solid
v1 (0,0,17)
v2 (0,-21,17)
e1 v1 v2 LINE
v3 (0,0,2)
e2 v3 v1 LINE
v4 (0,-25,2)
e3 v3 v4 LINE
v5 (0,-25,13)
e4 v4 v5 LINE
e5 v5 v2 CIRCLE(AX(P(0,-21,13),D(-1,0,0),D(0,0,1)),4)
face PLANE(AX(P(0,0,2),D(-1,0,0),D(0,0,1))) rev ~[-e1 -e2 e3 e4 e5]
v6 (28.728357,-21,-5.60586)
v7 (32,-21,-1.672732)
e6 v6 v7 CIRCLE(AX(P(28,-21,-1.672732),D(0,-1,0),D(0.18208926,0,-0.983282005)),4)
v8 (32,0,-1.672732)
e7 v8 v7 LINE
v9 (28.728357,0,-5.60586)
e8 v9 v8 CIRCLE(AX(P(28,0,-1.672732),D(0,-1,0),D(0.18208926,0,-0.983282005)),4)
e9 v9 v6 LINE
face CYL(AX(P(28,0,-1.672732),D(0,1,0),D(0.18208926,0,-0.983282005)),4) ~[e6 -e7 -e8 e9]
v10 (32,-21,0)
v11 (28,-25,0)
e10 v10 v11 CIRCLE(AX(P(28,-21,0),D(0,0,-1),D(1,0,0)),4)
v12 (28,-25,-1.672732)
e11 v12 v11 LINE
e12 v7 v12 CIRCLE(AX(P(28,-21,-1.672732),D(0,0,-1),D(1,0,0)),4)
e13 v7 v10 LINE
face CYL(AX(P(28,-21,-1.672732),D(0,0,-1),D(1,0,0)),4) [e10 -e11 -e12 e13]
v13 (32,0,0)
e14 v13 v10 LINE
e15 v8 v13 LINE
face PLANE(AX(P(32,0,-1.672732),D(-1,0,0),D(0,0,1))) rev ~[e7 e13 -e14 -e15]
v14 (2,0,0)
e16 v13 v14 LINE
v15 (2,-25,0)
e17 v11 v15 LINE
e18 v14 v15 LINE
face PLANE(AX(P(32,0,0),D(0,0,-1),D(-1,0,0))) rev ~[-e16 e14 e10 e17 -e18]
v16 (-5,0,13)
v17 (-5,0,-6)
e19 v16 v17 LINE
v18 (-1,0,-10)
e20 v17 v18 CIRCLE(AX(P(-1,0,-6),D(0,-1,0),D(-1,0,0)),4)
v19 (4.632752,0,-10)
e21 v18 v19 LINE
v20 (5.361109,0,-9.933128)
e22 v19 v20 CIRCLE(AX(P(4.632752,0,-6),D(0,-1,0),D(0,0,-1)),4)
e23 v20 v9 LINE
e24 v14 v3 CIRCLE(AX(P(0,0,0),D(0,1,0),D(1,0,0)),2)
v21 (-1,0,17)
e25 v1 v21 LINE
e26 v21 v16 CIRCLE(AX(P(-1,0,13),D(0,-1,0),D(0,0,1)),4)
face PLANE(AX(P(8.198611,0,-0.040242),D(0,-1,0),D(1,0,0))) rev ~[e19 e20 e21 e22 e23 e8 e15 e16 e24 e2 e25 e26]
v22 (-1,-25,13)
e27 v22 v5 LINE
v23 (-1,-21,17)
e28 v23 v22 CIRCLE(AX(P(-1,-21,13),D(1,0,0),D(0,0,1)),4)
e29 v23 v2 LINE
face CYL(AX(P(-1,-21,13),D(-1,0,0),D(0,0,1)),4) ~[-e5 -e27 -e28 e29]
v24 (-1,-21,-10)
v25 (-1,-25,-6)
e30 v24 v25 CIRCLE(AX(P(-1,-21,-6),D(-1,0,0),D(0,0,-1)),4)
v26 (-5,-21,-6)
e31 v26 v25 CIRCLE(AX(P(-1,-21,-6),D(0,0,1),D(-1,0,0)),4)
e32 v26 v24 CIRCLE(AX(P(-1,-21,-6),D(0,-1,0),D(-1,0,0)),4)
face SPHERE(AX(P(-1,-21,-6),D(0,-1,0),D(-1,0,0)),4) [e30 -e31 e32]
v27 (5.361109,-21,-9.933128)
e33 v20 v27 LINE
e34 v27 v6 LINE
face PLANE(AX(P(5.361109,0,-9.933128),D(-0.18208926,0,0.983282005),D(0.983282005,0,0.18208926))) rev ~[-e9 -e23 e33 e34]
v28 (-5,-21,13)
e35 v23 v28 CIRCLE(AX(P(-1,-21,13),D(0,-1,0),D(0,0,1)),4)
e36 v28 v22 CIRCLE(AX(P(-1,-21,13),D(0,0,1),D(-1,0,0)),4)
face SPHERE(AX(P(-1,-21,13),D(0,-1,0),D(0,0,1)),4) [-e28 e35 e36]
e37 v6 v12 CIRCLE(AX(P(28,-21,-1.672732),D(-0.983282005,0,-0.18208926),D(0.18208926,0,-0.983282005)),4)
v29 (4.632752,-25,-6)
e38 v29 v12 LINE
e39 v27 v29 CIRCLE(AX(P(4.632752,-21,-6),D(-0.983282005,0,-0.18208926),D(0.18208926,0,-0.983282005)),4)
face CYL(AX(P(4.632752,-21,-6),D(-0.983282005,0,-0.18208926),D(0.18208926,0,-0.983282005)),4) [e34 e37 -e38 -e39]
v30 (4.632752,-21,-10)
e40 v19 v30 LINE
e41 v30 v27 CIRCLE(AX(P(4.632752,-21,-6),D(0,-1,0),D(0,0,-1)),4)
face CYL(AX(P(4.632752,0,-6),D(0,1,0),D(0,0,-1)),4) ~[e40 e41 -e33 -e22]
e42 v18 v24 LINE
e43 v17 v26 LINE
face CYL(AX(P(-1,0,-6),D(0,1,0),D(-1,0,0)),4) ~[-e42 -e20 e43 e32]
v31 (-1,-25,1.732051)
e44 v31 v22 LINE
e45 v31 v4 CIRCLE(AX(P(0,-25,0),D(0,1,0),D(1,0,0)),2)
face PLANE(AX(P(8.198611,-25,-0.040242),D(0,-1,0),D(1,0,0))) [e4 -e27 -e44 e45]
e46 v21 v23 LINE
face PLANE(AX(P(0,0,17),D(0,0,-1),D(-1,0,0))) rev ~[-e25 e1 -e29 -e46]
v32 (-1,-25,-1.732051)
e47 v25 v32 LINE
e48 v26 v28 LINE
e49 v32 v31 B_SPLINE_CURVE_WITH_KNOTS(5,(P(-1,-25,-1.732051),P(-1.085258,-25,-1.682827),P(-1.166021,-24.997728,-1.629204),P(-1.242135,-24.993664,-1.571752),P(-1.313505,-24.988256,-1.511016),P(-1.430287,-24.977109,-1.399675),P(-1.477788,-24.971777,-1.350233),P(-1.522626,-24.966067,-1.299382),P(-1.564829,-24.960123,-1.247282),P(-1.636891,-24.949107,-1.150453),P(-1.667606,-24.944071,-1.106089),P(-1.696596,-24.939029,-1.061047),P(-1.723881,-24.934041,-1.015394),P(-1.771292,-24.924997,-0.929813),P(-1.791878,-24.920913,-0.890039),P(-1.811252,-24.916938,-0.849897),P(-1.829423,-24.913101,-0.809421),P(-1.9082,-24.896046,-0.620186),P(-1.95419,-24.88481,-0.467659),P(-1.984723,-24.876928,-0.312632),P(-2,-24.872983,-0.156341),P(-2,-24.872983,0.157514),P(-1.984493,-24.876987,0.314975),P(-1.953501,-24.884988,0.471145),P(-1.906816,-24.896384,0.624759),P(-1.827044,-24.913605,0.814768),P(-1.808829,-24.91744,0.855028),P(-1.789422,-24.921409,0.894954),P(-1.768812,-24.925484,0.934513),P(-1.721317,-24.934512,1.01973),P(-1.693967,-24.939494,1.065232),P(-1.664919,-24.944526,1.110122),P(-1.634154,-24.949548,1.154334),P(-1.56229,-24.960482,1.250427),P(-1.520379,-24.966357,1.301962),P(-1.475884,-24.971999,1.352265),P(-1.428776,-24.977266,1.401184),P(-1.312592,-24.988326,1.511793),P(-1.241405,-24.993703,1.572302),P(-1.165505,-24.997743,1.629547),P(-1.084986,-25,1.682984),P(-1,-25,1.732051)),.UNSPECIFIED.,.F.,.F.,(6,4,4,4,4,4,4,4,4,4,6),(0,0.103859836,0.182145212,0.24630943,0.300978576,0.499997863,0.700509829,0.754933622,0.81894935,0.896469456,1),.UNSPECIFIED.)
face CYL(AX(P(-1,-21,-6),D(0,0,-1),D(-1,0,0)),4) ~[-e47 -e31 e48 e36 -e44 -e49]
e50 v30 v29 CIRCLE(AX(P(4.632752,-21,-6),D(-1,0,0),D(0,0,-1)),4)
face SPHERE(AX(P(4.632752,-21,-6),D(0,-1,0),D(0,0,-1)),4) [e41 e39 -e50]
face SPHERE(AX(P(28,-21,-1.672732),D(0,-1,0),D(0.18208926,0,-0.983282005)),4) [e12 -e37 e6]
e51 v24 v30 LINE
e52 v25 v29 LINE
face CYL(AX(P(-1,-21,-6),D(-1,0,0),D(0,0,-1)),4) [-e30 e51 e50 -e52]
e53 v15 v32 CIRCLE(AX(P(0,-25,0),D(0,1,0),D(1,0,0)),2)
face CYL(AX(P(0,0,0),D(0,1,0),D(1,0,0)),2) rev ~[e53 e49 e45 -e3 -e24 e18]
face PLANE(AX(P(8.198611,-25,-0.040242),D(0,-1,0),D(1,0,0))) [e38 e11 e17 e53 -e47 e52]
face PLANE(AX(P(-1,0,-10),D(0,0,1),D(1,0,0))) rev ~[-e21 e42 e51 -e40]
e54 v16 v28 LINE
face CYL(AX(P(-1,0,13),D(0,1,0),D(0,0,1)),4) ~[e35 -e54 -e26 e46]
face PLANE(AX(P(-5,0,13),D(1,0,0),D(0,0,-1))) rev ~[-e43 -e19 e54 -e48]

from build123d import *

# Parameters (mm, degrees)
F1_DEPTH     = 25
F2_T1_DEPTH  = 19
F2_T3_DEPTH  = 23.7645438744
F2_T5_DEPTH  = 11.6727317873
F2_T7_DEPTH  = 11
F2_T9_DEPTH  = 5.6327516516
F2_T12_ANGLE = 79.5085229877
F2_T14_ANGLE = 90
F2_T16_ANGLE = 90
F2_T18_ANGLE = 10.4914770123


# Not quite as in the source:
# - a fillet or chamfer that OpenCascade refuses, or shapes differently, is made with other operations: its cross-section is extruded or revolved along the edge and cut away or added


with BuildPart() as f1:
    # F0 (on Front) → F1 (new body)
    with BuildSketch(Plane.XZ):
        with BuildLine():
            Line((32, 0), (2, 0))
            ThreePointArc((2, 0), (-1.4142135624, -1.4142135624), (0, 2))
            Line((0, 2), (0, 17))
            Line((0, 17), (-1, 17))
            ThreePointArc((-1, 17), (-3.8284271247, 15.8284271247), (-5, 13))
            Line((-5, 13), (-5, -6))
            ThreePointArc((-5, -6), (-3.8284271247, -8.8284271247), (-1, -10))
            Line((-1, -10), (4.6327516516, -10))
            ThreePointArc((4.6327516516, -10), (4.9984618649, -9.9832469218), (5.3611086923, -9.9331280199))
            Line((5.3611086923, -9.9331280199), (28.7283570407, -5.6058598073))
            ThreePointArc((28.7283570407, -5.6058598073), (31.0751770813, -4.2307165251), (32, -1.6727317873))
            Line((32, -1.6727317873), (32, 0))
        make_face()
    extrude(amount=F1_DEPTH)

    # F2: fillet of radius 4 on 9 edges, made by hand

    # F2_s2 → F2_t1 (cut)
    with BuildSketch(Plane.XY.offset(-6)):
        with BuildLine():
            ThreePointArc((-5, -21), (-3.8284271247, -23.8284271247), (-1, -25))
            Line((-1, -25), (-5, -25))
            Line((-5, -25), (-5, -21))
        make_face()
    extrude(amount=F2_T1_DEPTH, mode=Mode.SUBTRACT)

    # F2_s4 → F2_t3 (cut)
    with BuildSketch(Plane(origin=(3.4048752706, 0, 0.6305324575), x_dir=(0, 1, 0), z_dir=(0.983282005, 0, 0.1820892602))):
        with BuildLine():
            ThreePointArc((-21, -10.7432663508), (-23.8284271247, -9.5716934755), (-25, -6.7432663508))
            Line((-25, -6.7432663508), (-25, -10.7432663508))
            Line((-25, -10.7432663508), (-21, -10.7432663508))
        make_face()
    extrude(amount=F2_T3_DEPTH, mode=Mode.SUBTRACT)

    # F2_s6 → F2_t5 (cut)
    with BuildSketch(Plane.XY.offset(-1.6727317873)):
        with BuildLine():
            ThreePointArc((32, -21), (30.8284271247, -23.8284271247), (28, -25))
            Line((28, -25), (32, -25))
            Line((32, -25), (32, -21))
        make_face()
    extrude(amount=F2_T5_DEPTH, mode=Mode.SUBTRACT)

    # F2_s8 → F2_t7 (cut)
    with BuildSketch(Plane.YZ.offset(-1)):
        with BuildLine():
            ThreePointArc((-21, 17), (-23.8284271247, 15.8284271247), (-25, 13))
            Line((-25, 13), (-25, 17))
            Line((-25, 17), (-21, 17))
        make_face()
    extrude(amount=F2_T7_DEPTH, mode=Mode.SUBTRACT)

    # F2_s10 → F2_t9 (cut)
    with BuildSketch(Plane.YZ.offset(-1)):
        with BuildLine():
            ThreePointArc((-21, -10), (-23.8284271247, -8.8284271247), (-25, -6))
            Line((-25, -6), (-25, -10))
            Line((-25, -10), (-21, -10))
        make_face()
    extrude(amount=F2_T9_DEPTH, mode=Mode.SUBTRACT)

    # F2_s11 → F2_t12 (revolve, cut)
    with BuildSketch(Plane(origin=(26.772123619, 0, 4.9578006702), x_dir=(0, 1, 0), z_dir=(-0.983282005, 0, -0.1820892602))):
        with BuildLine():
            ThreePointArc((-21, 10.7432663508), (-23.8284271247, 9.5716934755), (-25, 6.7432663508))
            Line((-25, 6.7432663508), (-25, 10.7432663508))
            Line((-25, 10.7432663508), (-21, 10.7432663508))
        make_face()
    revolve(axis=Axis((28, -25, -1.6727317873), (0, -1, 0)), revolution_arc=F2_T12_ANGLE, mode=Mode.SUBTRACT)

    # F2_s13 → F2_t14 (revolve, cut)
    with BuildSketch(Plane.YZ.offset(-1)):
        with BuildLine():
            ThreePointArc((-21, 17), (-23.8284271247, 15.8284271247), (-25, 13))
            Line((-25, 13), (-25, 17))
            Line((-25, 17), (-21, 17))
        make_face()
    revolve(axis=Axis((-1, -25, 13), (0, -1, 0)), revolution_arc=F2_T14_ANGLE, mode=Mode.SUBTRACT)

    # F2_s15 → F2_t16 (revolve, cut)
    with BuildSketch(Plane.XY.offset(-6)):
        with BuildLine():
            ThreePointArc((-5, -21), (-3.8284271247, -23.8284271247), (-1, -25))
            Line((-1, -25), (-5, -25))
            Line((-5, -25), (-5, -21))
        make_face()
    revolve(axis=Axis((-1, -25, -6), (0, -1, 0)), revolution_arc=F2_T16_ANGLE, mode=Mode.SUBTRACT)

    # F2_s17 → F2_t18 (revolve, cut)
    with BuildSketch(Plane.YZ.offset(4.6327516516)):
        with BuildLine():
            ThreePointArc((-21, -10), (-23.8284271247, -8.8284271247), (-25, -6))
            Line((-25, -6), (-25, -10))
            Line((-25, -10), (-21, -10))
        make_face()
    revolve(axis=Axis((4.6327516516, -25, -6), (0, -1, 0)), revolution_arc=F2_T18_ANGLE, mode=Mode.SUBTRACT)


solid = f1.part
